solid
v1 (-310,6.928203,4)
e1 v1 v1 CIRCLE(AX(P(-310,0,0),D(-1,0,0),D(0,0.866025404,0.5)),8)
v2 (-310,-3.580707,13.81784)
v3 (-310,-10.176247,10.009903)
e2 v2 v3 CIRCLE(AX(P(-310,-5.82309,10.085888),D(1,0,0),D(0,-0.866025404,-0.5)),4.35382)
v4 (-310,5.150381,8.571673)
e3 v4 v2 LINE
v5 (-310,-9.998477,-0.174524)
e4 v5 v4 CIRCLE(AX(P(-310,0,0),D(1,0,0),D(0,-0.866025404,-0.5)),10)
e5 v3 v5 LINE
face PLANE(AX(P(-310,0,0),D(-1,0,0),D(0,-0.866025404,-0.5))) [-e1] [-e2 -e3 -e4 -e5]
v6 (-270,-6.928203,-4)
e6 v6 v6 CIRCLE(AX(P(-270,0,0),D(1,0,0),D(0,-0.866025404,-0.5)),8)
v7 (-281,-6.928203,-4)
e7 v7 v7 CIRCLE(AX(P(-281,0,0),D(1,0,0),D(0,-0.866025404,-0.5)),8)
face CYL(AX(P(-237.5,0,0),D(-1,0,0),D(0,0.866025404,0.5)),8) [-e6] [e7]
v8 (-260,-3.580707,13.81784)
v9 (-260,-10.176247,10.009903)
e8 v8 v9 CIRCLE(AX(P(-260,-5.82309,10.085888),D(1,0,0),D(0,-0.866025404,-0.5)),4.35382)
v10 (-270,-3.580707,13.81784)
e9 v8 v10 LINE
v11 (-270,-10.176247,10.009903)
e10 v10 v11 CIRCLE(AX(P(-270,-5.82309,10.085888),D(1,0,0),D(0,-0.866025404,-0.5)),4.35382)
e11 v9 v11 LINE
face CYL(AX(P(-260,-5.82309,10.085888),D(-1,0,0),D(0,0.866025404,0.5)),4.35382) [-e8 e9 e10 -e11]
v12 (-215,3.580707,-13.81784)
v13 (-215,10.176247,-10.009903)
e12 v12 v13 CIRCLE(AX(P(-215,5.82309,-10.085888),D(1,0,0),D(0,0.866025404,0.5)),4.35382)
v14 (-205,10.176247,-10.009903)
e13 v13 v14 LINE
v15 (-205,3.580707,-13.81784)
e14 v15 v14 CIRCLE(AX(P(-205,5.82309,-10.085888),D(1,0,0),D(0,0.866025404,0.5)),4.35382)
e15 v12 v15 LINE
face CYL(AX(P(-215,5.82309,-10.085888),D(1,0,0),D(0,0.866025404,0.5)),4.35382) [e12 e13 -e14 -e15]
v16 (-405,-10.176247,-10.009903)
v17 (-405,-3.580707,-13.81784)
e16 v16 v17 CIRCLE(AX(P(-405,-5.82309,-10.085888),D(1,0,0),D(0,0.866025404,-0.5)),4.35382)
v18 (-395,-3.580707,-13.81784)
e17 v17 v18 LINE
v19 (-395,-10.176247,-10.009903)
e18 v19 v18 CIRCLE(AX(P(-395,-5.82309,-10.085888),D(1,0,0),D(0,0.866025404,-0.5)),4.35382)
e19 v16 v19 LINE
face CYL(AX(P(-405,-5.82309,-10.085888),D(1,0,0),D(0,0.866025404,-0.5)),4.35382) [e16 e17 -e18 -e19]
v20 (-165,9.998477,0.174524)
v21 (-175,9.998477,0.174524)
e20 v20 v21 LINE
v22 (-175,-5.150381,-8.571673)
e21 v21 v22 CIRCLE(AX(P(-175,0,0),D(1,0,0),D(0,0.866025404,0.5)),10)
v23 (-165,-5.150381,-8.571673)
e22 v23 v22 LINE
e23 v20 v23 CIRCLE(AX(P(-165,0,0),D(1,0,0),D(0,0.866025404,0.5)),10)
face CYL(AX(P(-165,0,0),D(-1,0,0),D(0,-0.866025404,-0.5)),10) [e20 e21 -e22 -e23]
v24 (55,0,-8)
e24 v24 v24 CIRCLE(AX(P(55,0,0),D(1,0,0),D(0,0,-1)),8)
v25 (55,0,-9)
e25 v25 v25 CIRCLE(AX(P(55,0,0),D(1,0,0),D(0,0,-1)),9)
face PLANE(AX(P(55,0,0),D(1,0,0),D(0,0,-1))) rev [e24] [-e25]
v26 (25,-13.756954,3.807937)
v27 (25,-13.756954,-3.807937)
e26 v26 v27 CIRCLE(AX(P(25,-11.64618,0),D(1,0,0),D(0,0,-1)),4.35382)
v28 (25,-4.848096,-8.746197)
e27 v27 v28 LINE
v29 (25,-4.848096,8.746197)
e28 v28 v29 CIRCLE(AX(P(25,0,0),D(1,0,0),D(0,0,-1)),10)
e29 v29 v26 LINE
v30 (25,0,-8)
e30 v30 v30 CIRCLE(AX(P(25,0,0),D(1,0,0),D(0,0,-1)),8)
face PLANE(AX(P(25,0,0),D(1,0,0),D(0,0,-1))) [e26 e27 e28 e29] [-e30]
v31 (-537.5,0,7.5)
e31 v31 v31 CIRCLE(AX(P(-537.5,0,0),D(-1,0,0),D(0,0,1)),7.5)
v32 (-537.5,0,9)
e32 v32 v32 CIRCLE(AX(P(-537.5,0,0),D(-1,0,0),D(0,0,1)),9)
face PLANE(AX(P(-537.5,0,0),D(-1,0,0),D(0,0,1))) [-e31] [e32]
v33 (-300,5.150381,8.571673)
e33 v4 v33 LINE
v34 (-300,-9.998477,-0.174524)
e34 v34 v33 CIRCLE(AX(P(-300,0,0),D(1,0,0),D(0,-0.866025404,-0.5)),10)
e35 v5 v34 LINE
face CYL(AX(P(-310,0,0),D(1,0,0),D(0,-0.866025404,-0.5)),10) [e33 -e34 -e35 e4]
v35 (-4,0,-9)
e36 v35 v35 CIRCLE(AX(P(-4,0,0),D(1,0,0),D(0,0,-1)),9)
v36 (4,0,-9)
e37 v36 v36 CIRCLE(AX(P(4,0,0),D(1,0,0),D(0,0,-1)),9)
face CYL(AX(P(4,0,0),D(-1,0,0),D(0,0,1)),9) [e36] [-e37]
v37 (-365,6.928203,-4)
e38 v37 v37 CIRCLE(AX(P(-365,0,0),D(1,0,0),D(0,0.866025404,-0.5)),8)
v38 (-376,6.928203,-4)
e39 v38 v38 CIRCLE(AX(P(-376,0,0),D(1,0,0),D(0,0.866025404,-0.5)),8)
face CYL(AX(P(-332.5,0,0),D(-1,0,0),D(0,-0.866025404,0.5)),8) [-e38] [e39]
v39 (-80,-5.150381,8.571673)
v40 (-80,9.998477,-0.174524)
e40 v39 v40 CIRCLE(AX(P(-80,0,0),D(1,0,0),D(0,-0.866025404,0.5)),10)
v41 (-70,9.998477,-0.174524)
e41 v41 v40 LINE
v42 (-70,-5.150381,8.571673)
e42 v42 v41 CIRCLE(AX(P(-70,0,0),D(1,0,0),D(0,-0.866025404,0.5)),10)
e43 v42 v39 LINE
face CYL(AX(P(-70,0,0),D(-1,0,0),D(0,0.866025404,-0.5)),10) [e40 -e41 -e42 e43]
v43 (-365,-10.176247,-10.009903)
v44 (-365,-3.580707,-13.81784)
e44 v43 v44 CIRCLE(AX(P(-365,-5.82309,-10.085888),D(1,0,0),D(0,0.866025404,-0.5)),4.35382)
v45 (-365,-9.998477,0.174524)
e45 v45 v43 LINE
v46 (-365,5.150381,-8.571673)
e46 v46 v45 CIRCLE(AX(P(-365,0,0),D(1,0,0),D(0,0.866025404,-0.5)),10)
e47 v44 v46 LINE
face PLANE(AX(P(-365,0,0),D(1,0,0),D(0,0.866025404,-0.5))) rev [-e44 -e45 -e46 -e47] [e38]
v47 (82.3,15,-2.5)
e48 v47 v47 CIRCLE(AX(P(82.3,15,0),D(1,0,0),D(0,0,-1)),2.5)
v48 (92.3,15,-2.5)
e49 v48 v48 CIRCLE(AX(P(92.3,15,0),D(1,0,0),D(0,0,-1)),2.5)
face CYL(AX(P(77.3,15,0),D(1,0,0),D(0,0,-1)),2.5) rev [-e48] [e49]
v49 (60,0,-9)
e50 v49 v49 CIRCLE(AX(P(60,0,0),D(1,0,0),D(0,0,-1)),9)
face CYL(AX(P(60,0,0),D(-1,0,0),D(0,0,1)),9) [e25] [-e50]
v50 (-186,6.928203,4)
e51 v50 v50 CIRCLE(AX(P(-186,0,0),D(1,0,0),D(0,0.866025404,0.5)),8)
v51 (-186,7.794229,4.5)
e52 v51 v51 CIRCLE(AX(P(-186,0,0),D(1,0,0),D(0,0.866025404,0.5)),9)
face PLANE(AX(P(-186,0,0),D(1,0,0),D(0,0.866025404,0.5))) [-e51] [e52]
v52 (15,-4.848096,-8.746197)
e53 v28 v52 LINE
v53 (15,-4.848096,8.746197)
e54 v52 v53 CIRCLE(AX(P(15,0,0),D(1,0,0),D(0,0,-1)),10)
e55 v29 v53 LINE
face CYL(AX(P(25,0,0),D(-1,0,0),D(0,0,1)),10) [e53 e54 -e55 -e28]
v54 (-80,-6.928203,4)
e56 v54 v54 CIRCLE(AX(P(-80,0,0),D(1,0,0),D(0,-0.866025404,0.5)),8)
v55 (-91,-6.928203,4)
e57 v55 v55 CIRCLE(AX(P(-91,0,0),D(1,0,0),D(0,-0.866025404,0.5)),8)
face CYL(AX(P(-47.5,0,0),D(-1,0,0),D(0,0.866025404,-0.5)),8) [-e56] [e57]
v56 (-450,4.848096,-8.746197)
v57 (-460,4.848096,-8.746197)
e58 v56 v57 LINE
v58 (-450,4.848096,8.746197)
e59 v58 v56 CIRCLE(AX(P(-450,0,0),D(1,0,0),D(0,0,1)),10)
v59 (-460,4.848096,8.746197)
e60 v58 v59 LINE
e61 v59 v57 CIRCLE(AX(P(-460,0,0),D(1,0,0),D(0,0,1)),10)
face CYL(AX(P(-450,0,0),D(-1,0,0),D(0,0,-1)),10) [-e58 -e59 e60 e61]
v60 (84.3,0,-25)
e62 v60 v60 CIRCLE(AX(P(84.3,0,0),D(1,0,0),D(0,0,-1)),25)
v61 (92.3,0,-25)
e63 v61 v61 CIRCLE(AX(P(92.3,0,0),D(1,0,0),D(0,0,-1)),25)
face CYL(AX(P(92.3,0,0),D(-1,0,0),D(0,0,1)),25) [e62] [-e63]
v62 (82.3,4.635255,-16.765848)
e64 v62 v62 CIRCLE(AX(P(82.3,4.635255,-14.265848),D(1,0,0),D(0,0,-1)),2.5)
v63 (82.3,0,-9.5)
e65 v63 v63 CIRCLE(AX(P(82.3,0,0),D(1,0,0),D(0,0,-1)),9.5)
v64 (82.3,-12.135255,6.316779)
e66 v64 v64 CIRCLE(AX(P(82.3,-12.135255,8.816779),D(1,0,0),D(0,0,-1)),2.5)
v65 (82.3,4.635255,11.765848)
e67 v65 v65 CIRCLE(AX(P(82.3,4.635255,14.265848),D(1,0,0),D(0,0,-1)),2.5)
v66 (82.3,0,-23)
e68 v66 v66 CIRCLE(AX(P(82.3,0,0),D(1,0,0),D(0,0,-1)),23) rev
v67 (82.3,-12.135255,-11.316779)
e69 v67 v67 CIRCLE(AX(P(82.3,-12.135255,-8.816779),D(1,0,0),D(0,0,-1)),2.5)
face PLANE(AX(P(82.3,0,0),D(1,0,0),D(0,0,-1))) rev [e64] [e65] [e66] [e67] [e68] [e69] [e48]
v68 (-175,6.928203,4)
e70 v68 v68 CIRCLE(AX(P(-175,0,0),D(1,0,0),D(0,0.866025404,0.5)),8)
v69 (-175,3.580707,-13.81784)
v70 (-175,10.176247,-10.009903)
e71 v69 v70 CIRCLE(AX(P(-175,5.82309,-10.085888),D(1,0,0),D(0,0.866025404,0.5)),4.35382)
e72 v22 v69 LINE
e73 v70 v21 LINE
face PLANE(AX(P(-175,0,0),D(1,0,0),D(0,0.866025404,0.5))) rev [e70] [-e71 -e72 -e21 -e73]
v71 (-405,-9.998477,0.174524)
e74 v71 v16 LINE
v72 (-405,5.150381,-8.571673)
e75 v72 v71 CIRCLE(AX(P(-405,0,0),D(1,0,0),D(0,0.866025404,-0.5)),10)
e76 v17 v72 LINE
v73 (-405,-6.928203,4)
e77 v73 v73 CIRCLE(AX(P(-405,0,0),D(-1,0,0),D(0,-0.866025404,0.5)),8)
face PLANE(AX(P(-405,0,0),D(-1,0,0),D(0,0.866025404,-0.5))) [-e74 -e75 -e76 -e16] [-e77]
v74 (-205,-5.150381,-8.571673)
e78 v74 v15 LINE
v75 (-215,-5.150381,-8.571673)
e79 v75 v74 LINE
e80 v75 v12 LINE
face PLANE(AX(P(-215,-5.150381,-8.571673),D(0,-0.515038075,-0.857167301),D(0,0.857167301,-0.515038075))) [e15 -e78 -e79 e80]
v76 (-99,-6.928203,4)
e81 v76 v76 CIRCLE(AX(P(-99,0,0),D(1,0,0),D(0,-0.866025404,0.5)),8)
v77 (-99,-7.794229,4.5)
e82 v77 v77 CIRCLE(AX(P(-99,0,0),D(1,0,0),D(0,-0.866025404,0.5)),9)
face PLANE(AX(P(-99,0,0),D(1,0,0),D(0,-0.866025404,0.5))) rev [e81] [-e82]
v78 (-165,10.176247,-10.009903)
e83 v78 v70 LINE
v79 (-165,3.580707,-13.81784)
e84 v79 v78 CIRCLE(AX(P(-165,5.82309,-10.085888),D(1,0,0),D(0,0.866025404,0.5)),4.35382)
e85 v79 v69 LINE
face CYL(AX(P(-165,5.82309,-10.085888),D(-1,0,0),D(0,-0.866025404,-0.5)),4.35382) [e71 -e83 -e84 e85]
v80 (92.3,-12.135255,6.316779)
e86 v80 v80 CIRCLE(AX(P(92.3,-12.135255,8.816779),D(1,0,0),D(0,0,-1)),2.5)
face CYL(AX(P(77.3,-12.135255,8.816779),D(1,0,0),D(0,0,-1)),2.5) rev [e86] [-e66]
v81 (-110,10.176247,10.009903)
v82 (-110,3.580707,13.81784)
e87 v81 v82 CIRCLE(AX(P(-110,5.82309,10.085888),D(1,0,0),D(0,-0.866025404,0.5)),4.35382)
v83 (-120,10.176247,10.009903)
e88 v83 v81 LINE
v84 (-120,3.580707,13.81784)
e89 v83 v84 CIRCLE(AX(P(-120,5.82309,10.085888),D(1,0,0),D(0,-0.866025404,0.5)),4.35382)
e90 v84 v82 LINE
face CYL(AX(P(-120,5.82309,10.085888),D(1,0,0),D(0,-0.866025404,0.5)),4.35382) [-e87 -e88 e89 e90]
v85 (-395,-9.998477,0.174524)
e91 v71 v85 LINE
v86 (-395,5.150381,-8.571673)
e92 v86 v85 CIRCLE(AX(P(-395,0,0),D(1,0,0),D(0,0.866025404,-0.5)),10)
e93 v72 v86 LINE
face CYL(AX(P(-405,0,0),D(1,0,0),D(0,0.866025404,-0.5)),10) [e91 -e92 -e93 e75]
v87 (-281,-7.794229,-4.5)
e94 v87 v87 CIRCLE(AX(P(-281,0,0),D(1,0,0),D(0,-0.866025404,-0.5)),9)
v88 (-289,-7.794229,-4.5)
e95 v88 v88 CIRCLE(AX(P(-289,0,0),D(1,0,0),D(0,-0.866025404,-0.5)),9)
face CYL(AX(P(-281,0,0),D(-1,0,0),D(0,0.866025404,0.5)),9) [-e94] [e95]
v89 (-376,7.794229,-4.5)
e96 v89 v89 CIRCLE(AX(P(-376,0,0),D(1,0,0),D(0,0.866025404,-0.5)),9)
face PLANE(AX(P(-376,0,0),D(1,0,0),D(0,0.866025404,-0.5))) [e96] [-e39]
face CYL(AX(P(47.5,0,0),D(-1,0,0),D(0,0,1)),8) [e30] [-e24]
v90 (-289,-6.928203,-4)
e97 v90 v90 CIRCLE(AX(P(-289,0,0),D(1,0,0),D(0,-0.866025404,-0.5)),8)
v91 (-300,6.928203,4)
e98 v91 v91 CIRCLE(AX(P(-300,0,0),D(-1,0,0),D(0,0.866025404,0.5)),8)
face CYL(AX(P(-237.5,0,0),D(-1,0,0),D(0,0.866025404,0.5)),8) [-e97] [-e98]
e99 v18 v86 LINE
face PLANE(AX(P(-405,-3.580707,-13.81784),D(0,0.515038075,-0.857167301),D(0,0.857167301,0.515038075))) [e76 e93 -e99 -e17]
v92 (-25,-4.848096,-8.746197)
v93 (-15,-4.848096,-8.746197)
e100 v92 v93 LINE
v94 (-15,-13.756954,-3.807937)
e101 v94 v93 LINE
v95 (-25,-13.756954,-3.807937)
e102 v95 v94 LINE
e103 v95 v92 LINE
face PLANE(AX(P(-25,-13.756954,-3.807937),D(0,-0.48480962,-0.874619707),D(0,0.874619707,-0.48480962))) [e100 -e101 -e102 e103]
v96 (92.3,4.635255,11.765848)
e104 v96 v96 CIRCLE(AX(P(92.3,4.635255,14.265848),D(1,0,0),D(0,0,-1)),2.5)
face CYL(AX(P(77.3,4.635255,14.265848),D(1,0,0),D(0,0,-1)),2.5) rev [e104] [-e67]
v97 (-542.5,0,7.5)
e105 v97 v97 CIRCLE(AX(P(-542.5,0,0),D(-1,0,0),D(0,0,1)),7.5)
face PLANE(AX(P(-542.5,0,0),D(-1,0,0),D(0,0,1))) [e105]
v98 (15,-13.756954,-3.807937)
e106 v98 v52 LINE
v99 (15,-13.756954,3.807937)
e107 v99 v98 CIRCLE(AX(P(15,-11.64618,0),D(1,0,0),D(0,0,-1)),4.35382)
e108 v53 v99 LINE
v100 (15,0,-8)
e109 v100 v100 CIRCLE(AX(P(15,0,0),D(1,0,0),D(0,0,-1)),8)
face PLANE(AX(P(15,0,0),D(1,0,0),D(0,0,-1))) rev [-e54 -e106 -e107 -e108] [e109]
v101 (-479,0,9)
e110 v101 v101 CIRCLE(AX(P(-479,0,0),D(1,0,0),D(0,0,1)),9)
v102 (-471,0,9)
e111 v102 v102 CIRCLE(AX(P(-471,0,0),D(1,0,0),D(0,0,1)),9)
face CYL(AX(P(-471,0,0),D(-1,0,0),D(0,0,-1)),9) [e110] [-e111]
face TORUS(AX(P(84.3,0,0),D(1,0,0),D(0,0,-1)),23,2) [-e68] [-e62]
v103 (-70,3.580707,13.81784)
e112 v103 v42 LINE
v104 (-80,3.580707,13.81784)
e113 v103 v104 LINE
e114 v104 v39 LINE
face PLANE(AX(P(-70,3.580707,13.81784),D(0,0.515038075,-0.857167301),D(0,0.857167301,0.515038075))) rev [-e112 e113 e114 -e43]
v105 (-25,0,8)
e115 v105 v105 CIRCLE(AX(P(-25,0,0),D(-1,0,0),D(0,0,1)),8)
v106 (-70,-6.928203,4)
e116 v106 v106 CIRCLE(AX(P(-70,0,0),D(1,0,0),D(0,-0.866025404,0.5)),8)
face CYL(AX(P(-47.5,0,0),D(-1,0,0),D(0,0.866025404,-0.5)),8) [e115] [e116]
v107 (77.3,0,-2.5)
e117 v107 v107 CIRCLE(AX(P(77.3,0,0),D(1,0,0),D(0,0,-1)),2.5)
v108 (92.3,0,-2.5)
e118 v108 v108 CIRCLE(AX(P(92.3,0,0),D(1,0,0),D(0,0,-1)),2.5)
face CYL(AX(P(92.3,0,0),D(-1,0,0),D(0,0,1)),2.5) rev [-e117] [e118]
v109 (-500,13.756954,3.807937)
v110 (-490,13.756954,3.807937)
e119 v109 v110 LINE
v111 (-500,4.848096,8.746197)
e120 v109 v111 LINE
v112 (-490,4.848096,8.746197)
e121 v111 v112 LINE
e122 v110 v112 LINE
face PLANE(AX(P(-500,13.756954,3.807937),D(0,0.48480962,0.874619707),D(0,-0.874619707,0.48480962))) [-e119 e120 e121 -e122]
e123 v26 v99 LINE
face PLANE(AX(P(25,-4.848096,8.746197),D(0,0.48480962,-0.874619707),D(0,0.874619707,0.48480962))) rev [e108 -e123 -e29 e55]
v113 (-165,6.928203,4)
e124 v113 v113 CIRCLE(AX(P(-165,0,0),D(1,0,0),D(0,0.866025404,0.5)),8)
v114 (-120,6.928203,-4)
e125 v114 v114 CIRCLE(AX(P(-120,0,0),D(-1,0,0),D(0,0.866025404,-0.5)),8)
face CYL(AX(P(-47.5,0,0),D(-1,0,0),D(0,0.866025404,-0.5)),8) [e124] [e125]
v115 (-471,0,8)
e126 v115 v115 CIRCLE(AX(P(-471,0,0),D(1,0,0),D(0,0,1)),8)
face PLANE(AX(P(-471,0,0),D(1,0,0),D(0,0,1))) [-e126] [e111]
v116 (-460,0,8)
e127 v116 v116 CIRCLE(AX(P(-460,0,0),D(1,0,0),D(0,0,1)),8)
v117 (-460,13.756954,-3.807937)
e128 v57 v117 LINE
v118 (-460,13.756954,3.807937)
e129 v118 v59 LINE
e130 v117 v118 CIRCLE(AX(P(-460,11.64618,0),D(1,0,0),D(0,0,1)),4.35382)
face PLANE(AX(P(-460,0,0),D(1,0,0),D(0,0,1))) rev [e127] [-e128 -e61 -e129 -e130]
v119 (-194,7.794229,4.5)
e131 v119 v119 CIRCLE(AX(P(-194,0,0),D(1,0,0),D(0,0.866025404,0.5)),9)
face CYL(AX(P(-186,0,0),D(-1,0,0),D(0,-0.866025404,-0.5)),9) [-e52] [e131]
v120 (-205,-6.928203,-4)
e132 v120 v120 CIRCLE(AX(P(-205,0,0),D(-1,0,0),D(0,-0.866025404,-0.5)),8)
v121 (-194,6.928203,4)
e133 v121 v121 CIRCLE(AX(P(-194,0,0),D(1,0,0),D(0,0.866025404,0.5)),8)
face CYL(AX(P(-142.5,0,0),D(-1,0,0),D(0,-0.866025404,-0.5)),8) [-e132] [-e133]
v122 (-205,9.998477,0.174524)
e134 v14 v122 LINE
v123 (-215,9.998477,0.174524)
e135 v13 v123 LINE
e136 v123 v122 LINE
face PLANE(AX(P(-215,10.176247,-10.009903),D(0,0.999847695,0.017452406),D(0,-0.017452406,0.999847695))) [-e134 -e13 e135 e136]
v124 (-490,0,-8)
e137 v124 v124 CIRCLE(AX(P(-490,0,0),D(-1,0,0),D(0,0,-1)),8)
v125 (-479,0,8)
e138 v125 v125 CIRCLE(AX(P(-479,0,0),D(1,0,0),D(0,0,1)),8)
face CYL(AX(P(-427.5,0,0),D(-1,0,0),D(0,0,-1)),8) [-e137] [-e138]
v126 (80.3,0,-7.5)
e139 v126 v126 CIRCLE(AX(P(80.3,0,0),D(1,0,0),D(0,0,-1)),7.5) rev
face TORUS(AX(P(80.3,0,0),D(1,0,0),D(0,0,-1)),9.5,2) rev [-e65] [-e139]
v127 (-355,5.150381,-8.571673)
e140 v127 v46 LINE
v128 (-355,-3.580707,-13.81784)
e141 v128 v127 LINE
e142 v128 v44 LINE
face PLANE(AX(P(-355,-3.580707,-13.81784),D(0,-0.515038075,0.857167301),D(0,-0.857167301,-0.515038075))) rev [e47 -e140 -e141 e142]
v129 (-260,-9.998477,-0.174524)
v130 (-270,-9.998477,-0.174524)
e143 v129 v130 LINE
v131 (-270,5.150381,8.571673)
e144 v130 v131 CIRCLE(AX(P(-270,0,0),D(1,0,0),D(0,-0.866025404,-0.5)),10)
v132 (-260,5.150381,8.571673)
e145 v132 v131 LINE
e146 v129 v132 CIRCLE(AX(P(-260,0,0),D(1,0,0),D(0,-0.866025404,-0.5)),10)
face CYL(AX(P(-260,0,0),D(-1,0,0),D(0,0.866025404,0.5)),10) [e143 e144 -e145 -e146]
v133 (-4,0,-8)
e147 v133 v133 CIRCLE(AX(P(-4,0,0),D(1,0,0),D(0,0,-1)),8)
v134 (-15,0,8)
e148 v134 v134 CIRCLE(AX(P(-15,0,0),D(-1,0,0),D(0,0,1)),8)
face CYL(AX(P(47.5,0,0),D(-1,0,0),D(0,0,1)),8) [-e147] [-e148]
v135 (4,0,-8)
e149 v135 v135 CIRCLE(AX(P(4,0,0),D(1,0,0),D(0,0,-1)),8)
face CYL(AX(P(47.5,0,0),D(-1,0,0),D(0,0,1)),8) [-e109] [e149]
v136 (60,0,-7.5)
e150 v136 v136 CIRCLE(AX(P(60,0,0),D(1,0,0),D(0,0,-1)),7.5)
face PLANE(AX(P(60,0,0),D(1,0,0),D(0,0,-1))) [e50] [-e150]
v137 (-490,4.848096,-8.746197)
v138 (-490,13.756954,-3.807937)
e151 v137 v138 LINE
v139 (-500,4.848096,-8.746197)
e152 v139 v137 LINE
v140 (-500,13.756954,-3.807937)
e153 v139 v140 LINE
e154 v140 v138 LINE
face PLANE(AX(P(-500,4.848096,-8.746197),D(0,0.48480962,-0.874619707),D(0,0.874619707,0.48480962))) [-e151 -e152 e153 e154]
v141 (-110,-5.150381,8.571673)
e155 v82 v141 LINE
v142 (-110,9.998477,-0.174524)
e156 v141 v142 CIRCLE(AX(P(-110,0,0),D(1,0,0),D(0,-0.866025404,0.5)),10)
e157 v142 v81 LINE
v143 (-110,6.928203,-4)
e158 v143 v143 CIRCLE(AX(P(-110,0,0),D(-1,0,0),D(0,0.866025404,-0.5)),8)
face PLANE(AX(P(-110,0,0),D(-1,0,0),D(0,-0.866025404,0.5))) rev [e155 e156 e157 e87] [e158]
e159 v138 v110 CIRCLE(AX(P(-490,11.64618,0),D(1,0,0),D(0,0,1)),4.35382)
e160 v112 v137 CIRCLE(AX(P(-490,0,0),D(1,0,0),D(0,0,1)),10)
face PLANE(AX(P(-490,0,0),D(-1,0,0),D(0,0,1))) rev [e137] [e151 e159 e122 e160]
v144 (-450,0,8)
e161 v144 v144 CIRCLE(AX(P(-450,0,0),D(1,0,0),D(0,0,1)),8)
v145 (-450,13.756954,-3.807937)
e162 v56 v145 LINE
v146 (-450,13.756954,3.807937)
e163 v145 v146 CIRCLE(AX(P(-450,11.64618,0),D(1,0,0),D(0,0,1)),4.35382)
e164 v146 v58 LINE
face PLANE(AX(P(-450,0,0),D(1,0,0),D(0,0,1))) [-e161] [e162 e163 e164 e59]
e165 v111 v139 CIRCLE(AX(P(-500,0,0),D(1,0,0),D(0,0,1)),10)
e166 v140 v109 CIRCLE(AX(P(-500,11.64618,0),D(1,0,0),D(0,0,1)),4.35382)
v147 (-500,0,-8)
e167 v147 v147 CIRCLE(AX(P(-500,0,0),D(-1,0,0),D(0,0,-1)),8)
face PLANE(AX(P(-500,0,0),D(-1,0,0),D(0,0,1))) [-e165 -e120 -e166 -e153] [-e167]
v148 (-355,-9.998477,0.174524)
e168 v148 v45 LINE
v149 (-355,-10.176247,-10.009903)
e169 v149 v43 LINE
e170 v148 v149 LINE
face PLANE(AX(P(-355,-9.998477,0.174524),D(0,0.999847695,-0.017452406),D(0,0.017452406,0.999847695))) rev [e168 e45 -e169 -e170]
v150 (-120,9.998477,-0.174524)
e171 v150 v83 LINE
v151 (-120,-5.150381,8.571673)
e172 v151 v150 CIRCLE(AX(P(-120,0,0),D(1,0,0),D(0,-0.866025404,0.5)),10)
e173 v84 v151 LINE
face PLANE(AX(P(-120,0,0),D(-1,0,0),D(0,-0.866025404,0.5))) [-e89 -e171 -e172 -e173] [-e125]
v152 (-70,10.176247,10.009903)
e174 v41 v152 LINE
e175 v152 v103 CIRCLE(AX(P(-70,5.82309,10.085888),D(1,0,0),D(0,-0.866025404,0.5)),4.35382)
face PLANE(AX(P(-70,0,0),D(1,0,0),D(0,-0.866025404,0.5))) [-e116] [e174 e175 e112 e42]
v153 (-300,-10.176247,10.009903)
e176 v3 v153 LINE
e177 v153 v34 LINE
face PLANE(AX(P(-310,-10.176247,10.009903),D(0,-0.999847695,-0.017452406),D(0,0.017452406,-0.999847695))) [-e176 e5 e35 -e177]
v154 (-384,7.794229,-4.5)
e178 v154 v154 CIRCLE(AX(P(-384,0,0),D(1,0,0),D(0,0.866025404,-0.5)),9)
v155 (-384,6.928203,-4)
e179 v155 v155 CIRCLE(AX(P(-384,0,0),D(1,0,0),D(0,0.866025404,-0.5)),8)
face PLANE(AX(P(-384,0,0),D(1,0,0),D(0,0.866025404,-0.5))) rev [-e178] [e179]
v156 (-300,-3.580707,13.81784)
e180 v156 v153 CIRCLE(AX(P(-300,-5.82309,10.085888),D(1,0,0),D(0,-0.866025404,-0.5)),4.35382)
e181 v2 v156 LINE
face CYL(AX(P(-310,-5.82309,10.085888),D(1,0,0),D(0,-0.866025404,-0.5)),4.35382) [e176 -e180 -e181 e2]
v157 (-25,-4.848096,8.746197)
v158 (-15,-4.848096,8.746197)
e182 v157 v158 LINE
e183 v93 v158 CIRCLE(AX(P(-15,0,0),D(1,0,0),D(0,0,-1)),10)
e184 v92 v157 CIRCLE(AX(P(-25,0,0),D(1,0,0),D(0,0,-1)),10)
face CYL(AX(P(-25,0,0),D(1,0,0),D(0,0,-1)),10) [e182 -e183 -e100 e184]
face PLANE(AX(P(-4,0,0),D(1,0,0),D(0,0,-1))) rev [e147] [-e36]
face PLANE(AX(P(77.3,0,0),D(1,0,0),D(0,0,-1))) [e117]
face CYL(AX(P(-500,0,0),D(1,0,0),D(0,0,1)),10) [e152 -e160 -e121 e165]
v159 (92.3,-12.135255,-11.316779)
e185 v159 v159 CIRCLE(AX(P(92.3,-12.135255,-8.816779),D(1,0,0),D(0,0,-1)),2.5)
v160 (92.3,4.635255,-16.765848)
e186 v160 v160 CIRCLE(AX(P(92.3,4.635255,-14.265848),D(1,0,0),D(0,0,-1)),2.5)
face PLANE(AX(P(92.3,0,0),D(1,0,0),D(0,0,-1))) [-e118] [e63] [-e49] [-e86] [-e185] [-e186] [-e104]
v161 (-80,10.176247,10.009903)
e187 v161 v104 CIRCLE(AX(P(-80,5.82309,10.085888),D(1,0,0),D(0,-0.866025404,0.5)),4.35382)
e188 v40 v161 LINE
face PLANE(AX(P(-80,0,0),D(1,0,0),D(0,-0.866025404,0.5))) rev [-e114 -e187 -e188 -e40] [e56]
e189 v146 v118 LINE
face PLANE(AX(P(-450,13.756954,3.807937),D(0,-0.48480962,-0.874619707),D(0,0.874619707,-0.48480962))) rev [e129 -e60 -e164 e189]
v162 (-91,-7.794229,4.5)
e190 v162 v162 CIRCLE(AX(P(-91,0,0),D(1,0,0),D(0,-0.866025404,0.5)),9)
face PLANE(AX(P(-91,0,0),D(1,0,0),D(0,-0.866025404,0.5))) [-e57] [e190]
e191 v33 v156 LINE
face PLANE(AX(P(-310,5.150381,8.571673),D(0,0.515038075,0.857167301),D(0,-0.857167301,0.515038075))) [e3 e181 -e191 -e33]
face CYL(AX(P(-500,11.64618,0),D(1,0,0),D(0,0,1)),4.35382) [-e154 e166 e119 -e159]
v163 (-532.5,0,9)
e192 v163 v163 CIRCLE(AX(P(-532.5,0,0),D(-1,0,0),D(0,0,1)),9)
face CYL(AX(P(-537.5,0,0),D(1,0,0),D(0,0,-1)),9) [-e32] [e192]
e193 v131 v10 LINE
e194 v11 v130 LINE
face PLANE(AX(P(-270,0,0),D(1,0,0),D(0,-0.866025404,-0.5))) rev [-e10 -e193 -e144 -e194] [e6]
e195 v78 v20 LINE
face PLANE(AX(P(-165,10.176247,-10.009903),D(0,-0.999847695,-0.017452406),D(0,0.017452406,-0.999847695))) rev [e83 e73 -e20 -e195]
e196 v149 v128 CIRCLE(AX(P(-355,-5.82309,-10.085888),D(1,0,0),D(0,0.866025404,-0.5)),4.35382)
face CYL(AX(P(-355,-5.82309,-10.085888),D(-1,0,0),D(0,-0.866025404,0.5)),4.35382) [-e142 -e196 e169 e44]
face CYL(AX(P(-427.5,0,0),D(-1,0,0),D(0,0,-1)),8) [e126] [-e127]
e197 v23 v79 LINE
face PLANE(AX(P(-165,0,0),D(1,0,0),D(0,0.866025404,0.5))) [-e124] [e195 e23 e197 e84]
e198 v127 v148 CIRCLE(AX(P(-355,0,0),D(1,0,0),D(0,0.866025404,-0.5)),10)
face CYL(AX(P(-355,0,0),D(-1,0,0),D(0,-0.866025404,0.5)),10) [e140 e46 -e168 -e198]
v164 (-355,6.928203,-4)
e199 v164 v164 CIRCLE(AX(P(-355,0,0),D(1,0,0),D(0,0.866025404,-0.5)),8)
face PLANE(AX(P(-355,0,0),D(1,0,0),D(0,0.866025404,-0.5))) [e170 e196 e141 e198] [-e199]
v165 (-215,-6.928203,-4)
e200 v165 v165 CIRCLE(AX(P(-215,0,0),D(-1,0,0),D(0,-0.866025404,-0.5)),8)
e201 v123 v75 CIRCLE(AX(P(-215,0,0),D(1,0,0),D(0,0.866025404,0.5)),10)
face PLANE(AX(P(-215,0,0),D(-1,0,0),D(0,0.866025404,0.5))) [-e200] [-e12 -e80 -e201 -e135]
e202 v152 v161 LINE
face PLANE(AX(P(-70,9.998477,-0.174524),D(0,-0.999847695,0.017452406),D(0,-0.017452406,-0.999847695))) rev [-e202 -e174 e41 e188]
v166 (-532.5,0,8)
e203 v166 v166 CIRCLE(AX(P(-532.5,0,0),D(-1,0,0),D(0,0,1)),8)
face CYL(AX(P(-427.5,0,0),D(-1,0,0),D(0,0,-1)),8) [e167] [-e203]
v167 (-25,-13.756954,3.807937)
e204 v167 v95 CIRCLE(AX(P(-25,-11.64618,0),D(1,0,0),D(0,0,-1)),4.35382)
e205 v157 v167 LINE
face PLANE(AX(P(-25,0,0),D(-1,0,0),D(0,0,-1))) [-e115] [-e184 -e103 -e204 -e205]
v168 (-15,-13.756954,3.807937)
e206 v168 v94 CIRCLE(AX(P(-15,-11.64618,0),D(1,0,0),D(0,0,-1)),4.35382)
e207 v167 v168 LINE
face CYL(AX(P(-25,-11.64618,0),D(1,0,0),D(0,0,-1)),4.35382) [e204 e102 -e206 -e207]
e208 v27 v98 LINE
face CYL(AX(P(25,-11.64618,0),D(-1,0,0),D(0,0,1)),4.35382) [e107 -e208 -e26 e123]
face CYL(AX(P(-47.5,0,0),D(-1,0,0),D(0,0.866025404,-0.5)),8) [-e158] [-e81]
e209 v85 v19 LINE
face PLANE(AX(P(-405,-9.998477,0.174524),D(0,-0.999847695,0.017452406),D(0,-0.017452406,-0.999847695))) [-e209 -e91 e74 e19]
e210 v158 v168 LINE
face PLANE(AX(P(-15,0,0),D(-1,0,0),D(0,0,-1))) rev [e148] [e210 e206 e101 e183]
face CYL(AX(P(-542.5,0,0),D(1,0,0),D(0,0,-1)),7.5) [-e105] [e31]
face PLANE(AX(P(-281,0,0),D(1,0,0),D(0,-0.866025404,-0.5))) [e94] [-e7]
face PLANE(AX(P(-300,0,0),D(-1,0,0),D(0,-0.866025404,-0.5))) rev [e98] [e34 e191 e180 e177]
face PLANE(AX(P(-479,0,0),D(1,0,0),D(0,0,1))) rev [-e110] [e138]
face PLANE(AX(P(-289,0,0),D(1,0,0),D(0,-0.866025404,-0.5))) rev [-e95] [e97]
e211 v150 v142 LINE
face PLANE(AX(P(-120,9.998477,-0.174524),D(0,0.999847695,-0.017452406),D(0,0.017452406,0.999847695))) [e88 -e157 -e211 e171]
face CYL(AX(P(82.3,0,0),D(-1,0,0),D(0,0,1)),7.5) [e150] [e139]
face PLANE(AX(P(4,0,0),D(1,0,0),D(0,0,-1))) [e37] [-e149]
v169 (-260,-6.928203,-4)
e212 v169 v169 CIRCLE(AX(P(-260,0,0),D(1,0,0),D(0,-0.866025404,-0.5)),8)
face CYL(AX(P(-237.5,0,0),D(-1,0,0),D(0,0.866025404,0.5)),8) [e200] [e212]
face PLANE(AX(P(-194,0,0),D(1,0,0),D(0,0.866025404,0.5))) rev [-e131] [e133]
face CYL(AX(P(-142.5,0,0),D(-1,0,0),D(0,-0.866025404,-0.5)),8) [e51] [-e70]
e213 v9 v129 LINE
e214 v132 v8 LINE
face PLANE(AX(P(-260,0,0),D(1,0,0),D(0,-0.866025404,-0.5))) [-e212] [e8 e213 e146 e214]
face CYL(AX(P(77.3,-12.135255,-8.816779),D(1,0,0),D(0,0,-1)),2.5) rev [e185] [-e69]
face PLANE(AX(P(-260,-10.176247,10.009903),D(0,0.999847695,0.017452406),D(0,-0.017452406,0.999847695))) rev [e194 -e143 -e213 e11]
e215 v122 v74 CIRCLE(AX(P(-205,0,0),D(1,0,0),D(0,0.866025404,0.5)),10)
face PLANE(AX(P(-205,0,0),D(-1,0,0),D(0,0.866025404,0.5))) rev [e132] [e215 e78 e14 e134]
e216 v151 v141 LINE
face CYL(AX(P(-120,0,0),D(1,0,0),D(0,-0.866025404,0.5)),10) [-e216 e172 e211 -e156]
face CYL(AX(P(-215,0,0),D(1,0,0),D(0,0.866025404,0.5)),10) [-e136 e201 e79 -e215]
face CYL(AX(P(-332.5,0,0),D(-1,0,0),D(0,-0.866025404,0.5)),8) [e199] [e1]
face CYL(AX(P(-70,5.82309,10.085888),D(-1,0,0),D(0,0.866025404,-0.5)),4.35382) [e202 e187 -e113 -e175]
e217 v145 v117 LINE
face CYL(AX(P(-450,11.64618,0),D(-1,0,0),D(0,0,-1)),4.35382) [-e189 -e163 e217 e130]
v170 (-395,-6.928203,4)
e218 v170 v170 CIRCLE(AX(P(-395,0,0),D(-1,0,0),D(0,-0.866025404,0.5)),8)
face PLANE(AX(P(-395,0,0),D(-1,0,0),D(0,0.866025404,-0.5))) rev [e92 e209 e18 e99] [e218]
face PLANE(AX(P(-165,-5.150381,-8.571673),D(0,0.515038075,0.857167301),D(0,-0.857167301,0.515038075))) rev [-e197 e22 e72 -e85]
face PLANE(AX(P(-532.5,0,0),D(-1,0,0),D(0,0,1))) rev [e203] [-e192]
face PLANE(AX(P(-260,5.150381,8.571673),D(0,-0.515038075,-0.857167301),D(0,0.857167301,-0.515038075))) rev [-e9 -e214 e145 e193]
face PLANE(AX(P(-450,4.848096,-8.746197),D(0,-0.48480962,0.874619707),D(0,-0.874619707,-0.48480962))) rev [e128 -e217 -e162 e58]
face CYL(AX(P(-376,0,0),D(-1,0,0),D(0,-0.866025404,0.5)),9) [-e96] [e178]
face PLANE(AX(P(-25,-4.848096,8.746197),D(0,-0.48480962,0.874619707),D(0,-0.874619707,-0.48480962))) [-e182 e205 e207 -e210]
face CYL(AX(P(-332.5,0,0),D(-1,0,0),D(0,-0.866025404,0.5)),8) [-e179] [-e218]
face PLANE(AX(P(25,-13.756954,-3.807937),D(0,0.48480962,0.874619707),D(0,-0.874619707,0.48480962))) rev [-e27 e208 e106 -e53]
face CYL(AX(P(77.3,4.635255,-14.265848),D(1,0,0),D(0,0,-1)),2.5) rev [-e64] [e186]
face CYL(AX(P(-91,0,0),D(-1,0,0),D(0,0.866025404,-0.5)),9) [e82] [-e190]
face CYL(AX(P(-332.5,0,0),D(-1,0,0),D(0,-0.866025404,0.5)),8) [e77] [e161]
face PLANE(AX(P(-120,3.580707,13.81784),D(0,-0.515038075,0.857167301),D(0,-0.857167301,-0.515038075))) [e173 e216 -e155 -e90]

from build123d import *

# Parameters (mm, degrees)
SKETCH1_R             = 8
BOSS_EXTRUDE1_DEPTH   = 47.5
BOSS_EXTRUDE2_START   = 15
BOSS_EXTRUDE2_DEPTH   = 10
SKETCH3_R             = 9
BOSS_EXTRUDE3_DEPTH   = 4
LPATTERN1_COUNT       = 6
LPATTERN1_PITCH       = 95
BODY_MOVE_COPY1_ANGLE = 60
BODY_MOVE_COPY2_ANGLE = 120
BODY_MOVE_COPY3_ANGLE = 60
BODY_MOVE_COPY4_ANGLE = 120
BODY_MOVE_COPY5_ANGLE = 180
SKETCH4_R             = 8
BOSS_EXTRUDE4_DEPTH   = 10
SKETCH5_R             = 9
BOSS_EXTRUDE5_DEPTH   = 5
SKETCH6_R             = 7.5
BOSS_EXTRUDE6_DEPTH   = 5
SKETCH7_R             = 8
BOSS_EXTRUDE7_DEPTH   = 7.5
SKETCH8_R             = 9
BOSS_EXTRUDE8_DEPTH   = 5
SKETCH9_R             = 7.5
BOSS_EXTRUDE9_DEPTH   = 22.3
SKETCH10_R            = 25
SKETCH10_R_2          = 2.5
BOSS_EXTRUDE10_DEPTH  = 10
SKETCH11_R            = 2.5
CUT_EXTRUDE1_DEPTH    = 15
FILLET1_R             = 2


with BuildPart() as part:
    # Sketch1 → Boss-Extrude1 (new, symmetric)
    with BuildSketch(Plane(origin=(0, 0, 0), x_dir=(0, 0, -1), z_dir=(1, 0, 0))):
        Circle(SKETCH1_R)
    extrude(amount=BOSS_EXTRUDE1_DEPTH, both=True)

    # Sketch2 → Boss-Extrude2 (add)
    with BuildSketch(Plane(origin=(0, 0, 0), x_dir=(0, 0, -1), z_dir=(1, 0, 0)).offset(BOSS_EXTRUDE2_START)):
        with BuildLine():
            Line((-8.746197071, -4.848096202), (-3.807936598, -13.756953924))
            ThreePointArc((-3.807936598, -13.756953924), (0, -16), (3.807936598, -13.756953924))
            Line((3.807936598, -13.756953924), (8.746197071, -4.848096202))
            ThreePointArc((8.746197071, -4.848096202), (0, 10), (-8.746197071, -4.848096202))
        make_face()
    boss_extrude2 = extrude(amount=BOSS_EXTRUDE2_DEPTH)

    # Mirror1: Boss-Extrude2 across plane
    add(boss_extrude2.mirror(Plane(origin=(0, 0, 0), x_dir=(0, 0, 1), z_dir=(1, 0, 0))))

    # Sketch3 → Boss-Extrude3 (add, symmetric)
    with BuildSketch(Plane(origin=(0, 0, 0), x_dir=(0, 0, -1), z_dir=(1, 0, 0))):
        Circle(SKETCH3_R)
    extrude(amount=BOSS_EXTRUDE3_DEPTH, both=True)


with BuildPart() as lpattern1_1:
    # LPattern1: pattern copy
    add(part.part.moved(Location(Vector(-1, 0, 0) * (1 * LPATTERN1_PITCH))))


with BuildPart() as lpattern1_2:
    # LPattern1: pattern copy
    add(part.part.moved(Location(Vector(-1, 0, 0) * (2 * LPATTERN1_PITCH))))


with BuildPart() as lpattern1_3:
    # LPattern1: pattern copy
    add(part.part.moved(Location(Vector(-1, 0, 0) * (3 * LPATTERN1_PITCH))))


with BuildPart() as lpattern1_4:
    # LPattern1: pattern copy
    add(part.part.moved(Location(Vector(-1, 0, 0) * (4 * LPATTERN1_PITCH))))


with BuildPart() as lpattern1_5:
    # LPattern1: pattern copy
    add(part.part.moved(Location(Vector(-1, 0, 0) * (5 * LPATTERN1_PITCH))))


with BuildPart() as lpattern1_3_1:
    # Body-Move/Copy1: moved
    add(lpattern1_3.part.rotate(Axis((0, 0, 0), (-1, 0, 0)), BODY_MOVE_COPY1_ANGLE))


with BuildPart() as lpattern1_1_1:
    # Body-Move/Copy2: moved
    add(lpattern1_1.part.rotate(Axis((0, 0, 0), (-1, 0, 0)), BODY_MOVE_COPY2_ANGLE))


with BuildPart() as lpattern1_4_1:
    # Body-Move/Copy3: moved
    add(lpattern1_4.part.rotate(Axis((0, 0, 0), (1, 0, 0)), BODY_MOVE_COPY3_ANGLE))


with BuildPart() as lpattern1_2_1:
    # Body-Move/Copy4: moved
    add(lpattern1_2.part.rotate(Axis((0, 0, 0), (1, 0, 0)), BODY_MOVE_COPY4_ANGLE))


with BuildPart() as lpattern1_5_1:
    # Body-Move/Copy5: moved
    add(lpattern1_5.part.rotate(Axis((0, 0, 0), (1, 0, 0)), BODY_MOVE_COPY5_ANGLE))

    # Sketch4 → Boss-Extrude4 (add)
    with BuildSketch(Plane.ZY.offset(522.5)):
        Circle(SKETCH4_R)
    extrude(amount=BOSS_EXTRUDE4_DEPTH)

    # Sketch5 → Boss-Extrude5 (add)
    with BuildSketch(Plane.ZY.offset(532.5)):
        Circle(SKETCH5_R)
    extrude(amount=BOSS_EXTRUDE5_DEPTH)


with BuildPart() as lpattern1_4_2:
    add(lpattern1_4_1.part)

    # Combine1: union LPattern1_1, LPattern1_3, LPattern1_2, part, LPattern1_5
    add(lpattern1_1_1.part)
    add(lpattern1_3_1.part)
    add(lpattern1_2_1.part)
    add(part.part)
    add(lpattern1_5_1.part)

    # Sketch6 → Boss-Extrude6 (add)
    with BuildSketch(Plane.ZY.offset(537.5)):
        Circle(SKETCH6_R)
    extrude(amount=BOSS_EXTRUDE6_DEPTH)

    # Sketch7 → Boss-Extrude7 (add)
    with BuildSketch(Plane(origin=(47.5, 0, 0), x_dir=(0, 0, -1), z_dir=(1, 0, 0))):
        Circle(SKETCH7_R)
    extrude(amount=BOSS_EXTRUDE7_DEPTH)

    # Sketch8 → Boss-Extrude8 (add)
    with BuildSketch(Plane(origin=(55, 0, 0), x_dir=(0, 0, -1), z_dir=(1, 0, 0))):
        Circle(SKETCH8_R)
    extrude(amount=BOSS_EXTRUDE8_DEPTH)

    # Sketch9 → Boss-Extrude9 (add)
    with BuildSketch(Plane(origin=(60, 0, 0), x_dir=(0, 0, -1), z_dir=(1, 0, 0))):
        Circle(SKETCH9_R)
    extrude(amount=BOSS_EXTRUDE9_DEPTH)

    # Sketch10 → Boss-Extrude10 (add)
    with BuildSketch(Plane(origin=(82.3, 0, 0), x_dir=(0, 0, -1), z_dir=(1, 0, 0))):
        Circle(SKETCH10_R)
        Circle(SKETCH10_R_2, mode=Mode.SUBTRACT)
    extrude(amount=BOSS_EXTRUDE10_DEPTH)

    # Sketch11 → Cut-Extrude1 (cut)
    with BuildSketch(Plane(origin=(92.3, 0, 0), x_dir=(0, 0, -1), z_dir=(1, 0, 0))):
        with Locations((0, 15)):
            Circle(SKETCH11_R)
        Circle(SKETCH11_R)
        with Locations((14.265847744, 4.635254916)):
            Circle(SKETCH11_R)
        with Locations((8.816778784, -12.135254916)):
            Circle(SKETCH11_R)
        with Locations((-8.816778784, -12.135254916)):
            Circle(SKETCH11_R)
        with Locations((-14.265847744, 4.635254916)):
            Circle(SKETCH11_R)
    extrude(amount=-CUT_EXTRUDE1_DEPTH, mode=Mode.SUBTRACT)

    # Fillet1
    fillet1_edges = [lpattern1_4_2.edges().sort_by_distance(p)[0] for p in [
        (82.3, 0, 25),
        (82.3, 0, 7.5),
    ]]
    fillet(fillet1_edges, radius=FILLET1_R)


solid = lpattern1_4_2.part
